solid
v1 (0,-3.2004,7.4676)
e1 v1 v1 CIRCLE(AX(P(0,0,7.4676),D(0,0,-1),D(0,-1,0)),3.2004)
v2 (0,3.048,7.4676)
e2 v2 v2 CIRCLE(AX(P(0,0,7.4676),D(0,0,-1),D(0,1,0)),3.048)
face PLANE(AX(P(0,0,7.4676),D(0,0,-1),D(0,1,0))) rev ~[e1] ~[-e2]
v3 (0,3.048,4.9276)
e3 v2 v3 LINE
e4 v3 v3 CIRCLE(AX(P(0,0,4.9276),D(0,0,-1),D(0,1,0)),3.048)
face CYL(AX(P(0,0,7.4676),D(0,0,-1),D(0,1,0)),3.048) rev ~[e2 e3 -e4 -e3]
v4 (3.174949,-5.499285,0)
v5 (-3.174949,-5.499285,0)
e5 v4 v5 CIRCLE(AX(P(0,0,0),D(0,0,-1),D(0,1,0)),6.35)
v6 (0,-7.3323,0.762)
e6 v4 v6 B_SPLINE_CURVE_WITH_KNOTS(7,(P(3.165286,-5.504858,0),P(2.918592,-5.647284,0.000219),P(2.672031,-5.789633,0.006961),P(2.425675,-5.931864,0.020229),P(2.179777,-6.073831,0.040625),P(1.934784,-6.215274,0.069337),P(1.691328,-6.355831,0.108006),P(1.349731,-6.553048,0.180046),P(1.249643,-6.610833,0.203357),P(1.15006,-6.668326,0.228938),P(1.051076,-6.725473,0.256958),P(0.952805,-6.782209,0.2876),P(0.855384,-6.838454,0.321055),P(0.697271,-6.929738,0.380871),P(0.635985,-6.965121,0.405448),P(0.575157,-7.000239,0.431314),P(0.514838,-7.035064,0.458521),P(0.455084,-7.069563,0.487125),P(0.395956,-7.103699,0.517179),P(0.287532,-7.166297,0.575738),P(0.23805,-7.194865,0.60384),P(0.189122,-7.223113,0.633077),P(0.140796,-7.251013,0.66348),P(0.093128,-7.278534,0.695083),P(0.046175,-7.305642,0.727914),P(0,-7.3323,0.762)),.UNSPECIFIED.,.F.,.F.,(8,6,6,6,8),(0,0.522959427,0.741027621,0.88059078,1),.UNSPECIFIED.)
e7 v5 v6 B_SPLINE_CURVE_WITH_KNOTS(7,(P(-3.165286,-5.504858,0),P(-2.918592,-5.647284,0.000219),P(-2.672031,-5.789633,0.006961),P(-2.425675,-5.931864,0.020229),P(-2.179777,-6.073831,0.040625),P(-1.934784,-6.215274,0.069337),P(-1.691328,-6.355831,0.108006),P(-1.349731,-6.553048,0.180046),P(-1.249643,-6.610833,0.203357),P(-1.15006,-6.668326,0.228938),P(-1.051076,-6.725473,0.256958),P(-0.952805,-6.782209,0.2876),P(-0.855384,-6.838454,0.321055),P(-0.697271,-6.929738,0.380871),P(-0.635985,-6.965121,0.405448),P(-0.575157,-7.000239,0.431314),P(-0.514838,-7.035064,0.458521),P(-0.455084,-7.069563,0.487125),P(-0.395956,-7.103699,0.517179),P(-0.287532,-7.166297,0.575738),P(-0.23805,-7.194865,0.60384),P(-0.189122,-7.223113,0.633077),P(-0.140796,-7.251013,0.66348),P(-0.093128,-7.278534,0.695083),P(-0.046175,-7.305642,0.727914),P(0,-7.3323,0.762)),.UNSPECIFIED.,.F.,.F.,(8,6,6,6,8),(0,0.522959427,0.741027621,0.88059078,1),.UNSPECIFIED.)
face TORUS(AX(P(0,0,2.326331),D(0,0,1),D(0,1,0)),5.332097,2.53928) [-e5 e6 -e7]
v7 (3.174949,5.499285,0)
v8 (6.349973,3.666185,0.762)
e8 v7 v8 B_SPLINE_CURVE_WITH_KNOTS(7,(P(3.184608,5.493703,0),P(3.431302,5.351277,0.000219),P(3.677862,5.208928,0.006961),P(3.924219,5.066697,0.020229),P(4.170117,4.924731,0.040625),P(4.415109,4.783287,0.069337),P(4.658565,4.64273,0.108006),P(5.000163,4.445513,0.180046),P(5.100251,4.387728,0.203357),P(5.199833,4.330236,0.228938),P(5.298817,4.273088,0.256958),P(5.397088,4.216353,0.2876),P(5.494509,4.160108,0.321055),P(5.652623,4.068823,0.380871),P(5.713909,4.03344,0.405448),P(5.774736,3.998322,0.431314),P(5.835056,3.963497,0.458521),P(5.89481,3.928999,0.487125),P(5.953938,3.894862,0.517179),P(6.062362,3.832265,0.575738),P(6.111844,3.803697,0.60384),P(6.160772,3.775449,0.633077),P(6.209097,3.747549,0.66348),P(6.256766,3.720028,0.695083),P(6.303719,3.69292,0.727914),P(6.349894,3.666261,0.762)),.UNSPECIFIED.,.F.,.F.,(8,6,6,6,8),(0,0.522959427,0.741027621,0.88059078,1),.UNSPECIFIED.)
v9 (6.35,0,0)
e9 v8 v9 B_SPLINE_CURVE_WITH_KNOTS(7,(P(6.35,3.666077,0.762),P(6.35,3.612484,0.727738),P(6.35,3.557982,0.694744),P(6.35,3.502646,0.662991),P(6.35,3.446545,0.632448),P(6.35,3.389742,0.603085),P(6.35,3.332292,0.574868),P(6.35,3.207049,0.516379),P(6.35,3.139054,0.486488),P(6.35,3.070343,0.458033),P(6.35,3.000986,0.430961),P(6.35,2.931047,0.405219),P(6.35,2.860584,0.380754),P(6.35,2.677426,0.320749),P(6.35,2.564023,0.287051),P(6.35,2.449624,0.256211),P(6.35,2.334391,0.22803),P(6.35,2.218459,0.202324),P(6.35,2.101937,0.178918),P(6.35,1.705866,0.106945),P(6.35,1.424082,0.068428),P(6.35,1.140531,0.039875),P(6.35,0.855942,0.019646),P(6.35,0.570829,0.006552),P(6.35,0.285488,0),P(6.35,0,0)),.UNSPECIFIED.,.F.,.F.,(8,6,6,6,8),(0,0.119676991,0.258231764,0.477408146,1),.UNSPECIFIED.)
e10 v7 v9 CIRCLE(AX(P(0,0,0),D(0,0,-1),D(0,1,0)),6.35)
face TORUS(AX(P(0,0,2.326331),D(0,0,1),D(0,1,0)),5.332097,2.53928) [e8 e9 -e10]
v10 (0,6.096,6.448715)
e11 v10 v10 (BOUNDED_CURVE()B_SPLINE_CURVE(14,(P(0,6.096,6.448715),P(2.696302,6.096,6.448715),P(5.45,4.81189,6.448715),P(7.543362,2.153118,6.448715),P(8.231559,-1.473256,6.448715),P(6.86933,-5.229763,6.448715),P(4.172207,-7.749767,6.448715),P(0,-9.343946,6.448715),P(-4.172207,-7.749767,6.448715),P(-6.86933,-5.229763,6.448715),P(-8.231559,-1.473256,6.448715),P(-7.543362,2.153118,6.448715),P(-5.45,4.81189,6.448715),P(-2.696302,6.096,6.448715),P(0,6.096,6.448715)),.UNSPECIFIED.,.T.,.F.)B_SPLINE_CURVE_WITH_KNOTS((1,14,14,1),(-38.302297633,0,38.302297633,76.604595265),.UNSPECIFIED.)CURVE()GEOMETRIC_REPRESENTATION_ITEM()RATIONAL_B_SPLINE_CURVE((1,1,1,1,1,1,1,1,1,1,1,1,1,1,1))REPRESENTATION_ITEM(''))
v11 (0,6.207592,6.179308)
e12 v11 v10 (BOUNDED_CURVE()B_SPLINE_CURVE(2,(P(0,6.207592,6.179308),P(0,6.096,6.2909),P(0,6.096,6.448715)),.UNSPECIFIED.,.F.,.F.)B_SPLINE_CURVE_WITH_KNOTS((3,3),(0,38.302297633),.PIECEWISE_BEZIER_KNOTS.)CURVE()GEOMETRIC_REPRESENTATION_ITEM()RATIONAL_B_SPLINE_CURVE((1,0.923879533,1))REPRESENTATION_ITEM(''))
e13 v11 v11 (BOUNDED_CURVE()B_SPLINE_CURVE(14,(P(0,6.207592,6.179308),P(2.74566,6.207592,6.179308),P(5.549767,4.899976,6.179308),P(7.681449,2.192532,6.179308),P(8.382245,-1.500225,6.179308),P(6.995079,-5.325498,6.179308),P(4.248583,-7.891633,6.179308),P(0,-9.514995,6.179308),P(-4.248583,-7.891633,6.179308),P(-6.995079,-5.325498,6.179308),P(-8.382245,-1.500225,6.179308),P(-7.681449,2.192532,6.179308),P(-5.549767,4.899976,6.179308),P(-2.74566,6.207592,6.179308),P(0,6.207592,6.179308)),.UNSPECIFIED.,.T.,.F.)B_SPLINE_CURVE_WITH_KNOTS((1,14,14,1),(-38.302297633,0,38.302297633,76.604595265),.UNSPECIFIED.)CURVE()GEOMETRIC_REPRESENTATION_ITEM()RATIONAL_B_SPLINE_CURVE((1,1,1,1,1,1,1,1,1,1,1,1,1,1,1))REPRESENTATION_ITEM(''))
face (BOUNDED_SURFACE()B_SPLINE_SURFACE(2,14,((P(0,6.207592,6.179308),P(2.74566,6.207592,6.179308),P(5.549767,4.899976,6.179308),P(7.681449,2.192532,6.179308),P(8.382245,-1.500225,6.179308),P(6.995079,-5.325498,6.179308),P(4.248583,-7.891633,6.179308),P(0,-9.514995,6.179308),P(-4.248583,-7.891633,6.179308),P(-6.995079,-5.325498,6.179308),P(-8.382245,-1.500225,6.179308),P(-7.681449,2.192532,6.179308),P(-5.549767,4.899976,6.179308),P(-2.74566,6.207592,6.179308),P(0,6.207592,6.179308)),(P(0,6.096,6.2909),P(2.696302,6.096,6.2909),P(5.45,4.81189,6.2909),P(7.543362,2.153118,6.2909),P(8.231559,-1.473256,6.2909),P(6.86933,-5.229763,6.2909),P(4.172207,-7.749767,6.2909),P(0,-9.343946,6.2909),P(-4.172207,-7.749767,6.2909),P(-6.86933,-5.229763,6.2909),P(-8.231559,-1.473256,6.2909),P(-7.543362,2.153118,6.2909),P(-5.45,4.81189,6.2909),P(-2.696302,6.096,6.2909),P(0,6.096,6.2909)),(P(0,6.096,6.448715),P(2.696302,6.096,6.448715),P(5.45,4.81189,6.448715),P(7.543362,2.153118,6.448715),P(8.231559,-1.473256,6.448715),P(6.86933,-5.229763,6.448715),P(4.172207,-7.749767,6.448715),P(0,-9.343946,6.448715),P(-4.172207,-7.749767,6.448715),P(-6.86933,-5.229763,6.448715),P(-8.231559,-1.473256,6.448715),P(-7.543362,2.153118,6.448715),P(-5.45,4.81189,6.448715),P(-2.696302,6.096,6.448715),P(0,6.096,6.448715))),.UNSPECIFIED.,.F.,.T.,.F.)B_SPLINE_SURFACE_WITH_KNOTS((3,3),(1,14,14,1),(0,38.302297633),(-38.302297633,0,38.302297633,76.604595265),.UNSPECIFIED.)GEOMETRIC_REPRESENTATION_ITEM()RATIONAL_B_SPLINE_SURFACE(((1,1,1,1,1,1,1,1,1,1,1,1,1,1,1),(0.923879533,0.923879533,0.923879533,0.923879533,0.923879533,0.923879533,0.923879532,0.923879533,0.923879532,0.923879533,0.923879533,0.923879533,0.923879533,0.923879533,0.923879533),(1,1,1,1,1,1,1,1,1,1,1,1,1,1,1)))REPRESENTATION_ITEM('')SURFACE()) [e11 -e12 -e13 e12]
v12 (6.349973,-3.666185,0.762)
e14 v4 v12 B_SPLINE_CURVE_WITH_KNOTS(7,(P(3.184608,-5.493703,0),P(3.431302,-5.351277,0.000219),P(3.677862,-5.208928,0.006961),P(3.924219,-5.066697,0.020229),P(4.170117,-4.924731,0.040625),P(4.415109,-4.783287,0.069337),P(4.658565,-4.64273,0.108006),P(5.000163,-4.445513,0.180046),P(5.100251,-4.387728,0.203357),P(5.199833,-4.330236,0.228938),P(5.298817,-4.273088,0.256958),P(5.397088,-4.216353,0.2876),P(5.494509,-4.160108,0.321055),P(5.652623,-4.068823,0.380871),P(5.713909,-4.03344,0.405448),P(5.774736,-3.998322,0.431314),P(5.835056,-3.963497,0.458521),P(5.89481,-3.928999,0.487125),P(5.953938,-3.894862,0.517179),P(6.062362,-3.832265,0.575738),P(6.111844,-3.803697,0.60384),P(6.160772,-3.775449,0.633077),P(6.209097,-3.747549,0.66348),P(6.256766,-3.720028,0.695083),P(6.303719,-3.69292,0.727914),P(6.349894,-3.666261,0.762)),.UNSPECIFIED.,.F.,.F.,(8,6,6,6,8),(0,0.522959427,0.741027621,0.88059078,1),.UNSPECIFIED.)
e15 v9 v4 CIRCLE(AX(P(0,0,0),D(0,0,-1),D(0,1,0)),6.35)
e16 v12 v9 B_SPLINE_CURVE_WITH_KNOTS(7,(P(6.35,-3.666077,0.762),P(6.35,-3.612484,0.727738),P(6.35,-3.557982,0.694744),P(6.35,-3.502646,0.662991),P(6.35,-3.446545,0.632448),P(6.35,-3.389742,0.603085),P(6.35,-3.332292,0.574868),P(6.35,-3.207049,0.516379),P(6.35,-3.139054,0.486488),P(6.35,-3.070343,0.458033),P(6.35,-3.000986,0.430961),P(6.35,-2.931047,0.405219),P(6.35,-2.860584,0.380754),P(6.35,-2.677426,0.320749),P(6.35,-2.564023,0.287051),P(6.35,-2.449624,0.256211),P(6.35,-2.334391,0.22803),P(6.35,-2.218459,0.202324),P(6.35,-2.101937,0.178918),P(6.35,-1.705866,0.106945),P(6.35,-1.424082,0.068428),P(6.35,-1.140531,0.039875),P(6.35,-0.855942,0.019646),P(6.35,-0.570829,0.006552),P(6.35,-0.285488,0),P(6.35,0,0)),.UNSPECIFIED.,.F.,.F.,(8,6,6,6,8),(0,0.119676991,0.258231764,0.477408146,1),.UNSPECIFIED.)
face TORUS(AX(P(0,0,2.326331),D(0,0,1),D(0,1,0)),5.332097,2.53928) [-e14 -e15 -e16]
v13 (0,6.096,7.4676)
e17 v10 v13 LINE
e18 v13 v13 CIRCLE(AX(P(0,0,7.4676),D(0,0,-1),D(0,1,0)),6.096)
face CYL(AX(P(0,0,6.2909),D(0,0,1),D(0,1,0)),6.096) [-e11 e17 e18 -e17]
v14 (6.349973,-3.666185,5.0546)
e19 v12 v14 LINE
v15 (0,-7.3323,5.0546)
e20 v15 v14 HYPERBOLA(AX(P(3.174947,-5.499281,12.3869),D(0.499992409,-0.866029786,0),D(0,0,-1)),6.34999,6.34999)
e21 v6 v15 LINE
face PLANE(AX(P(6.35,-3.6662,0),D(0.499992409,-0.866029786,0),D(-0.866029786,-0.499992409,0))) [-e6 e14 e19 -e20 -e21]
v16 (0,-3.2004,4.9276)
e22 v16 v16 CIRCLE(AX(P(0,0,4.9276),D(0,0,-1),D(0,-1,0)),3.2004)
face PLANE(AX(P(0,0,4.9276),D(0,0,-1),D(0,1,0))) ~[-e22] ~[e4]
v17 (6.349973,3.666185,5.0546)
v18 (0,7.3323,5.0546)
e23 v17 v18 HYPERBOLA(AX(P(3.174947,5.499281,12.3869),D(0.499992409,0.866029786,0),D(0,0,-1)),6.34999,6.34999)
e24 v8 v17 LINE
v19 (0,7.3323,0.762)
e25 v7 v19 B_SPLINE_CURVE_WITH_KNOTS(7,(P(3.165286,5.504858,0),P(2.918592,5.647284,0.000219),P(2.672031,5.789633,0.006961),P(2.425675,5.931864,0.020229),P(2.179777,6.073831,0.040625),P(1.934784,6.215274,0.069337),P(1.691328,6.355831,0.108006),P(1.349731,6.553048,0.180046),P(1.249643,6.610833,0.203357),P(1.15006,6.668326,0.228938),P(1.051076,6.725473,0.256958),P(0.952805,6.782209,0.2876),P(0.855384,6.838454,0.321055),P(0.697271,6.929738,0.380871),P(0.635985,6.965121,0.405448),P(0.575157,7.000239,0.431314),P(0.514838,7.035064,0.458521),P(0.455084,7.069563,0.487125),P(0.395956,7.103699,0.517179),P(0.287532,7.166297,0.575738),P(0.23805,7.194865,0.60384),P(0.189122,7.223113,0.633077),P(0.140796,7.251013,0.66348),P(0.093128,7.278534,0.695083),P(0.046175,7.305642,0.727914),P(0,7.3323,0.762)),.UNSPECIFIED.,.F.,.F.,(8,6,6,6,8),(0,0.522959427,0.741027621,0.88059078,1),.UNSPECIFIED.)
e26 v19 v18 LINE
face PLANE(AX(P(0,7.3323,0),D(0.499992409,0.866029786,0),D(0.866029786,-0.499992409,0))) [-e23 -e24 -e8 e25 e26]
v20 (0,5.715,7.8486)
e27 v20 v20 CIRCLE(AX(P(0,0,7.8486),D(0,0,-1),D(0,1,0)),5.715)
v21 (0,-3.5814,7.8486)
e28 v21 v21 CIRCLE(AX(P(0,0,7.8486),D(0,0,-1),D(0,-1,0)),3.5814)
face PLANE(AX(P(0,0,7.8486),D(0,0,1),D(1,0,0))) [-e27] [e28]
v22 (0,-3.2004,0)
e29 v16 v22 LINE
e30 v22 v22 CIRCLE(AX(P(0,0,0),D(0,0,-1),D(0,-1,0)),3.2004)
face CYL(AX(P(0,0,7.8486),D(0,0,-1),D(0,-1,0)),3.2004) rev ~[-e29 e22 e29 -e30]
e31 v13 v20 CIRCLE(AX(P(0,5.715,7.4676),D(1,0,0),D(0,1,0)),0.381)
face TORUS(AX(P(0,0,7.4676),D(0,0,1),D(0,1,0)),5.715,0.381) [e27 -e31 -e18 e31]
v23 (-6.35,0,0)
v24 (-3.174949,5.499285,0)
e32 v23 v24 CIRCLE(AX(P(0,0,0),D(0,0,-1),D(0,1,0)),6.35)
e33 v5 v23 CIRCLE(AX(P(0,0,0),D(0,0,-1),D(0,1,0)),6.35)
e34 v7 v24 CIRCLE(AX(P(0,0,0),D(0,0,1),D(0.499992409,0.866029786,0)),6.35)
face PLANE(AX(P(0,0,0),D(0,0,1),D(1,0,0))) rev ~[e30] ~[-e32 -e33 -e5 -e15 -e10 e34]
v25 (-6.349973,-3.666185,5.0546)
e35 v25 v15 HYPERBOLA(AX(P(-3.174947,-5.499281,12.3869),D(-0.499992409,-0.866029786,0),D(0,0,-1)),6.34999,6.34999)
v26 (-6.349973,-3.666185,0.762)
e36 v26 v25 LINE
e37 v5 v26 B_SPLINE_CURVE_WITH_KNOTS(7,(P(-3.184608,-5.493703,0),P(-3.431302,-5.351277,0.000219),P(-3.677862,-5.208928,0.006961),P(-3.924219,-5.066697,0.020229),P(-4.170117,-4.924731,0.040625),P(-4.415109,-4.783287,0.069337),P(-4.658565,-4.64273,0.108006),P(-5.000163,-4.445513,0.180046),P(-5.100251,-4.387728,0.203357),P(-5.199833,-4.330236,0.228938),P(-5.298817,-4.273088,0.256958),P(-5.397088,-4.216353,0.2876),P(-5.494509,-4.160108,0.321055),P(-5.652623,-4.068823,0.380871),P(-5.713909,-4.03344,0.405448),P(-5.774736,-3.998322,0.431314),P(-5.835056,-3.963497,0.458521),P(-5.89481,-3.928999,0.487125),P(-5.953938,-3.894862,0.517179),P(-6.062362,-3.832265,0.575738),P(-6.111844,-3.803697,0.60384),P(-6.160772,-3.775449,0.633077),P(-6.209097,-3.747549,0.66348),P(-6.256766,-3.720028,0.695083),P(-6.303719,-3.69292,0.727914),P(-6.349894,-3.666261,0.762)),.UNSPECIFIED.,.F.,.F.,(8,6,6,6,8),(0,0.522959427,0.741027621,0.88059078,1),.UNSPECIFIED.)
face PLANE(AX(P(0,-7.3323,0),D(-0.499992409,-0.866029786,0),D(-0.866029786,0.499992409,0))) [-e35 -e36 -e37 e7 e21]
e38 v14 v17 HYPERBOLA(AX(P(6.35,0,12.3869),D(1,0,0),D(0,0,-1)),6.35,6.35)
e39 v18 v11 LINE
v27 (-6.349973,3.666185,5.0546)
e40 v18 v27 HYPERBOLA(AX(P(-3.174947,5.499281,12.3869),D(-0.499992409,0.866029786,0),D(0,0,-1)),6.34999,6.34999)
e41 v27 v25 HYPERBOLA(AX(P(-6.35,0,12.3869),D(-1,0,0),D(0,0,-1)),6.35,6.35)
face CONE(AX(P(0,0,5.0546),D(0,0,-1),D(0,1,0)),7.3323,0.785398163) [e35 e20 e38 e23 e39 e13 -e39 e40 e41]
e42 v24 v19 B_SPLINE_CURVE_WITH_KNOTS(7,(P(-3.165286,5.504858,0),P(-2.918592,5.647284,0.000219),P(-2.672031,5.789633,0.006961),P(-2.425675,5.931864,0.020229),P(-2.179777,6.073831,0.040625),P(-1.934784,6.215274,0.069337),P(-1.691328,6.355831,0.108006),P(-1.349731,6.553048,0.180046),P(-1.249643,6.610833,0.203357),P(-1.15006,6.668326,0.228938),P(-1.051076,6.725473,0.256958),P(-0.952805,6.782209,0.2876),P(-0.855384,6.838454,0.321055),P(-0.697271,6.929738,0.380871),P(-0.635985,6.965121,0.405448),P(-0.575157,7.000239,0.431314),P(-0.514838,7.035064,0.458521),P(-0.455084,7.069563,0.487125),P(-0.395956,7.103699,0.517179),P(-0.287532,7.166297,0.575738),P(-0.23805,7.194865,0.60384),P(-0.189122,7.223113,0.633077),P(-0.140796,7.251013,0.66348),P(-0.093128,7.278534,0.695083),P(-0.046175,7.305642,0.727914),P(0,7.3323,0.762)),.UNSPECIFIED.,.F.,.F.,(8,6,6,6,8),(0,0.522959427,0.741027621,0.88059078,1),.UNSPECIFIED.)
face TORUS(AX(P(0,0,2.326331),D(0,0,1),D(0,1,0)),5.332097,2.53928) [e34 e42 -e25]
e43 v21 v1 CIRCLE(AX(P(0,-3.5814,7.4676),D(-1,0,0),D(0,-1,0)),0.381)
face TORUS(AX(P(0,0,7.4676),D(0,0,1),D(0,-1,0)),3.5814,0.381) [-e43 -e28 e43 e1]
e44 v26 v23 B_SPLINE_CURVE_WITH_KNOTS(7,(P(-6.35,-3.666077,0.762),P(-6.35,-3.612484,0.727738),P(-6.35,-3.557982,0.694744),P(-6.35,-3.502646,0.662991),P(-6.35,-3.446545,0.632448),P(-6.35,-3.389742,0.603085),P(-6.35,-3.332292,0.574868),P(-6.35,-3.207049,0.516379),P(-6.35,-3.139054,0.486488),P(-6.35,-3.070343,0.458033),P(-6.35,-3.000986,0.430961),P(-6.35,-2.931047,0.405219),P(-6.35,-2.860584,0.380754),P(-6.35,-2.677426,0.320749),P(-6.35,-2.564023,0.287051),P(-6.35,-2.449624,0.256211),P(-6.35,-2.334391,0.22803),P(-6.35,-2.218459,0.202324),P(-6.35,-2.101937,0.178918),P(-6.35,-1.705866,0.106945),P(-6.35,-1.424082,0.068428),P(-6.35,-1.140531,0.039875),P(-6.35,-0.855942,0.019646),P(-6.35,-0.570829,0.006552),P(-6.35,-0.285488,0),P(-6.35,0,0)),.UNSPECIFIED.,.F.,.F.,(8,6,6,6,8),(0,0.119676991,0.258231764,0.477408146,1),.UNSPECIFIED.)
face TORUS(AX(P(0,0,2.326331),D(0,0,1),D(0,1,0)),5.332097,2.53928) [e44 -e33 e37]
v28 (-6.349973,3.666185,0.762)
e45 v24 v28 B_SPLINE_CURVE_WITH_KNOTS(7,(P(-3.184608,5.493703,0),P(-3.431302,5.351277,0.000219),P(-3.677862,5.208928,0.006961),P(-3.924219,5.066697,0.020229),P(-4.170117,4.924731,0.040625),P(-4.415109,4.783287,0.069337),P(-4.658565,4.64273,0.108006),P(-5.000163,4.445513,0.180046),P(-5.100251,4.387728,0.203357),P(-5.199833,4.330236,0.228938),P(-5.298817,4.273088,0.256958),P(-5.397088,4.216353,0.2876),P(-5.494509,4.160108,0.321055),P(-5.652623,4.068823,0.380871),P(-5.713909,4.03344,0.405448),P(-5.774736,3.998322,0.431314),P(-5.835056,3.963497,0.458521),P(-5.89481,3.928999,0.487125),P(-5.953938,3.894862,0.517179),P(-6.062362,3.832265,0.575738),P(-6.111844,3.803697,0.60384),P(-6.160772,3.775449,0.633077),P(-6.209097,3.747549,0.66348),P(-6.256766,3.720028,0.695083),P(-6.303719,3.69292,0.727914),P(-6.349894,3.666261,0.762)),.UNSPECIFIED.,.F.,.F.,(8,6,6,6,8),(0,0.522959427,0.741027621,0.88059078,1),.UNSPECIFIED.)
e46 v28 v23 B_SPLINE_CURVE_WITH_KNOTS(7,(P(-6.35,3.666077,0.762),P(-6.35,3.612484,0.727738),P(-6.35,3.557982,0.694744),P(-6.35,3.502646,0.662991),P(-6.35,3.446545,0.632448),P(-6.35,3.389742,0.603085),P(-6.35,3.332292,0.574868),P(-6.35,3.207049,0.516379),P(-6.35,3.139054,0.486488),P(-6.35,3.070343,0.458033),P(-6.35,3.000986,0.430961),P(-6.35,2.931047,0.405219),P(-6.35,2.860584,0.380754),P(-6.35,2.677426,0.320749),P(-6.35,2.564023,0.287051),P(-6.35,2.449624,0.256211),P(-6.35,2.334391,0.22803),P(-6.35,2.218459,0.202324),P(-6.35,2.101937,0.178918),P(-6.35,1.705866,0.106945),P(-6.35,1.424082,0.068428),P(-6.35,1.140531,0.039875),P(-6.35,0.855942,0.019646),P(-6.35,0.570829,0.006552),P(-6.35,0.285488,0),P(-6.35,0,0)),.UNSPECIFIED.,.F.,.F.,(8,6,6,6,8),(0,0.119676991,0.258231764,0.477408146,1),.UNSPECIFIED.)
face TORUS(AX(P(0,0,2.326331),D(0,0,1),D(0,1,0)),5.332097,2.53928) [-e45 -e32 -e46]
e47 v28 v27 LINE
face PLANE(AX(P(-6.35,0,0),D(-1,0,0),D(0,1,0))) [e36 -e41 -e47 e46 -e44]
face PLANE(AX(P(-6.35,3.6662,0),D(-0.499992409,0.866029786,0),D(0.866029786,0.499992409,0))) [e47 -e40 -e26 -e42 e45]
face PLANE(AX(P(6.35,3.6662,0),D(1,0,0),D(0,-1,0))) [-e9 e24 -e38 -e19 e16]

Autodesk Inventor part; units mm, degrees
ref_plane "YZ Plane" through (0, 0, 0) normal (1, 0, 0) x (0, 1, 0)
ref_plane "XZ Plane" through (0, 0, 0) normal (0, 1, 0) x (-1, 0, 0)
ref_plane "XY Plane" through (0, 0, 0) normal (0, 0, 1) x (1, 0, 0)
sketch "Sketch1" plane through (0, 0, 0) normal (0, 0, 1) x (1, 0, 0)
  line L0 (0, 7.3323) -> (6.35, 3.6662)
  line L1 (6.35, 3.6662) -> (6.35, -3.6662)
  line L2 (6.35, -3.6662) -> (0, -7.3323)
  line L3 (0, -7.3323) -> (-6.35, -3.6662)
  line L4 (-6.35, -3.6662) -> (-6.35, 3.6662)
  line L5 (-6.35, 3.6662) -> (0, 7.3323)
  line L6 (0, 10.2653) -> (0, -10.2653) projected
  line L7 (-8.89, 0) -> (8.89, 0) projected
  point P0 (0, 0)
  dimension "d0" = 12.7
extrude "Extrusion1" add sketch "Sketch1" along normal blind 7.8486
sketch "Sketch2" plane through (0, 0, 0) normal (1, 0, 0) x (0, 1, 0)
  line L0 (7.3323, 0) -> (7.3323, 7.8486) projected
  line L1 (3.6662, 7.8486) -> (-3.6662, 7.8486) projected
  line L2 (7.3323, 7.8486) -> (3.6662, 7.8486) projected
  line L3 (3.6662, 7.8486) -> (7.3323, 7.8486) projected
  line L4 (-3.6662, 7.8486) -> (3.6662, 7.8486) projected
  line L5 (-7.3323, 7.8486) -> (-3.6662, 7.8486) projected
  line L6 (-3.6662, 7.8486) -> (-7.3323, 7.8486) projected
  line L7 (7.3323, 5.0546) -> (6.096, 6.2909)
  line L8 (6.096, 6.2909) -> (6.096, 7.8486)
  line L9 (7.3323, 7.8486) -> (7.3323, 5.0546)
  line L10 (5.588, 7.4676) -> (3.048, 7.4676)
  line L11 (3.048, 7.4676) -> (3.048, 4.9276)
  line L12 (3.048, 4.9276) -> (5.588, 4.9276)
  line L13 (5.588, 4.9276) -> (5.588, 7.4676)
  line L14 (0, 13.9621) -> (0, -2.3404) projected
  arc A0 (6.35, 0) -> (7.3323, 0.762) centre (5.3317, 2.327) ccw
  line L15 (7.3323, 0) -> (3.6662, 0) projected
  line L16 (6.35, 0) -> (7.3323, 0)
  line L17 (7.3323, 0.762) -> (7.3323, 0)
  dimension "d3" = 2.794
  dimension "d4" = 45
  dimension "d5" = 6.096
  dimension "d6" = 3.048
  dimension "d7" = 0.381
  dimension "d8" = 2.54
  dimension "d9" = 2.54
  dimension "d11" = 6.35
  dimension "d12" = 0.762
  dimension "d13" = 2.54
revolve "Revolution1" cut sketch "Sketch2" angle 360 about axis through (0, 0, 0) along (0, 0, -1) contours L7 L8 L2 L0
revolve "Revolution2" cut sketch "Sketch2" angle 360 about axis through (0, 0, 0) along (0, 0, -1) contours L15 A0 L0
hole "Hole1" at (0, 0, 7.8486) direction (0, 0, -1) diameter 6.4008 end through all thread size "5/16-18 UNC" class "2B" standard "ANSI Unified Screw Threads"
fillet "Fillet1" radius 0.381 3 edges at (0, -6.096, 6.2909) (0, -6.096, 7.8486) (0, 3.2004, 7.8486)
revolve "Revolution3" add sketch "Sketch2" angle 360 about axis through (0, 0, 0) along (0, 0, -1) contours L13 L12 L11 L10
properties part number "HW-00033" material "Steel"
